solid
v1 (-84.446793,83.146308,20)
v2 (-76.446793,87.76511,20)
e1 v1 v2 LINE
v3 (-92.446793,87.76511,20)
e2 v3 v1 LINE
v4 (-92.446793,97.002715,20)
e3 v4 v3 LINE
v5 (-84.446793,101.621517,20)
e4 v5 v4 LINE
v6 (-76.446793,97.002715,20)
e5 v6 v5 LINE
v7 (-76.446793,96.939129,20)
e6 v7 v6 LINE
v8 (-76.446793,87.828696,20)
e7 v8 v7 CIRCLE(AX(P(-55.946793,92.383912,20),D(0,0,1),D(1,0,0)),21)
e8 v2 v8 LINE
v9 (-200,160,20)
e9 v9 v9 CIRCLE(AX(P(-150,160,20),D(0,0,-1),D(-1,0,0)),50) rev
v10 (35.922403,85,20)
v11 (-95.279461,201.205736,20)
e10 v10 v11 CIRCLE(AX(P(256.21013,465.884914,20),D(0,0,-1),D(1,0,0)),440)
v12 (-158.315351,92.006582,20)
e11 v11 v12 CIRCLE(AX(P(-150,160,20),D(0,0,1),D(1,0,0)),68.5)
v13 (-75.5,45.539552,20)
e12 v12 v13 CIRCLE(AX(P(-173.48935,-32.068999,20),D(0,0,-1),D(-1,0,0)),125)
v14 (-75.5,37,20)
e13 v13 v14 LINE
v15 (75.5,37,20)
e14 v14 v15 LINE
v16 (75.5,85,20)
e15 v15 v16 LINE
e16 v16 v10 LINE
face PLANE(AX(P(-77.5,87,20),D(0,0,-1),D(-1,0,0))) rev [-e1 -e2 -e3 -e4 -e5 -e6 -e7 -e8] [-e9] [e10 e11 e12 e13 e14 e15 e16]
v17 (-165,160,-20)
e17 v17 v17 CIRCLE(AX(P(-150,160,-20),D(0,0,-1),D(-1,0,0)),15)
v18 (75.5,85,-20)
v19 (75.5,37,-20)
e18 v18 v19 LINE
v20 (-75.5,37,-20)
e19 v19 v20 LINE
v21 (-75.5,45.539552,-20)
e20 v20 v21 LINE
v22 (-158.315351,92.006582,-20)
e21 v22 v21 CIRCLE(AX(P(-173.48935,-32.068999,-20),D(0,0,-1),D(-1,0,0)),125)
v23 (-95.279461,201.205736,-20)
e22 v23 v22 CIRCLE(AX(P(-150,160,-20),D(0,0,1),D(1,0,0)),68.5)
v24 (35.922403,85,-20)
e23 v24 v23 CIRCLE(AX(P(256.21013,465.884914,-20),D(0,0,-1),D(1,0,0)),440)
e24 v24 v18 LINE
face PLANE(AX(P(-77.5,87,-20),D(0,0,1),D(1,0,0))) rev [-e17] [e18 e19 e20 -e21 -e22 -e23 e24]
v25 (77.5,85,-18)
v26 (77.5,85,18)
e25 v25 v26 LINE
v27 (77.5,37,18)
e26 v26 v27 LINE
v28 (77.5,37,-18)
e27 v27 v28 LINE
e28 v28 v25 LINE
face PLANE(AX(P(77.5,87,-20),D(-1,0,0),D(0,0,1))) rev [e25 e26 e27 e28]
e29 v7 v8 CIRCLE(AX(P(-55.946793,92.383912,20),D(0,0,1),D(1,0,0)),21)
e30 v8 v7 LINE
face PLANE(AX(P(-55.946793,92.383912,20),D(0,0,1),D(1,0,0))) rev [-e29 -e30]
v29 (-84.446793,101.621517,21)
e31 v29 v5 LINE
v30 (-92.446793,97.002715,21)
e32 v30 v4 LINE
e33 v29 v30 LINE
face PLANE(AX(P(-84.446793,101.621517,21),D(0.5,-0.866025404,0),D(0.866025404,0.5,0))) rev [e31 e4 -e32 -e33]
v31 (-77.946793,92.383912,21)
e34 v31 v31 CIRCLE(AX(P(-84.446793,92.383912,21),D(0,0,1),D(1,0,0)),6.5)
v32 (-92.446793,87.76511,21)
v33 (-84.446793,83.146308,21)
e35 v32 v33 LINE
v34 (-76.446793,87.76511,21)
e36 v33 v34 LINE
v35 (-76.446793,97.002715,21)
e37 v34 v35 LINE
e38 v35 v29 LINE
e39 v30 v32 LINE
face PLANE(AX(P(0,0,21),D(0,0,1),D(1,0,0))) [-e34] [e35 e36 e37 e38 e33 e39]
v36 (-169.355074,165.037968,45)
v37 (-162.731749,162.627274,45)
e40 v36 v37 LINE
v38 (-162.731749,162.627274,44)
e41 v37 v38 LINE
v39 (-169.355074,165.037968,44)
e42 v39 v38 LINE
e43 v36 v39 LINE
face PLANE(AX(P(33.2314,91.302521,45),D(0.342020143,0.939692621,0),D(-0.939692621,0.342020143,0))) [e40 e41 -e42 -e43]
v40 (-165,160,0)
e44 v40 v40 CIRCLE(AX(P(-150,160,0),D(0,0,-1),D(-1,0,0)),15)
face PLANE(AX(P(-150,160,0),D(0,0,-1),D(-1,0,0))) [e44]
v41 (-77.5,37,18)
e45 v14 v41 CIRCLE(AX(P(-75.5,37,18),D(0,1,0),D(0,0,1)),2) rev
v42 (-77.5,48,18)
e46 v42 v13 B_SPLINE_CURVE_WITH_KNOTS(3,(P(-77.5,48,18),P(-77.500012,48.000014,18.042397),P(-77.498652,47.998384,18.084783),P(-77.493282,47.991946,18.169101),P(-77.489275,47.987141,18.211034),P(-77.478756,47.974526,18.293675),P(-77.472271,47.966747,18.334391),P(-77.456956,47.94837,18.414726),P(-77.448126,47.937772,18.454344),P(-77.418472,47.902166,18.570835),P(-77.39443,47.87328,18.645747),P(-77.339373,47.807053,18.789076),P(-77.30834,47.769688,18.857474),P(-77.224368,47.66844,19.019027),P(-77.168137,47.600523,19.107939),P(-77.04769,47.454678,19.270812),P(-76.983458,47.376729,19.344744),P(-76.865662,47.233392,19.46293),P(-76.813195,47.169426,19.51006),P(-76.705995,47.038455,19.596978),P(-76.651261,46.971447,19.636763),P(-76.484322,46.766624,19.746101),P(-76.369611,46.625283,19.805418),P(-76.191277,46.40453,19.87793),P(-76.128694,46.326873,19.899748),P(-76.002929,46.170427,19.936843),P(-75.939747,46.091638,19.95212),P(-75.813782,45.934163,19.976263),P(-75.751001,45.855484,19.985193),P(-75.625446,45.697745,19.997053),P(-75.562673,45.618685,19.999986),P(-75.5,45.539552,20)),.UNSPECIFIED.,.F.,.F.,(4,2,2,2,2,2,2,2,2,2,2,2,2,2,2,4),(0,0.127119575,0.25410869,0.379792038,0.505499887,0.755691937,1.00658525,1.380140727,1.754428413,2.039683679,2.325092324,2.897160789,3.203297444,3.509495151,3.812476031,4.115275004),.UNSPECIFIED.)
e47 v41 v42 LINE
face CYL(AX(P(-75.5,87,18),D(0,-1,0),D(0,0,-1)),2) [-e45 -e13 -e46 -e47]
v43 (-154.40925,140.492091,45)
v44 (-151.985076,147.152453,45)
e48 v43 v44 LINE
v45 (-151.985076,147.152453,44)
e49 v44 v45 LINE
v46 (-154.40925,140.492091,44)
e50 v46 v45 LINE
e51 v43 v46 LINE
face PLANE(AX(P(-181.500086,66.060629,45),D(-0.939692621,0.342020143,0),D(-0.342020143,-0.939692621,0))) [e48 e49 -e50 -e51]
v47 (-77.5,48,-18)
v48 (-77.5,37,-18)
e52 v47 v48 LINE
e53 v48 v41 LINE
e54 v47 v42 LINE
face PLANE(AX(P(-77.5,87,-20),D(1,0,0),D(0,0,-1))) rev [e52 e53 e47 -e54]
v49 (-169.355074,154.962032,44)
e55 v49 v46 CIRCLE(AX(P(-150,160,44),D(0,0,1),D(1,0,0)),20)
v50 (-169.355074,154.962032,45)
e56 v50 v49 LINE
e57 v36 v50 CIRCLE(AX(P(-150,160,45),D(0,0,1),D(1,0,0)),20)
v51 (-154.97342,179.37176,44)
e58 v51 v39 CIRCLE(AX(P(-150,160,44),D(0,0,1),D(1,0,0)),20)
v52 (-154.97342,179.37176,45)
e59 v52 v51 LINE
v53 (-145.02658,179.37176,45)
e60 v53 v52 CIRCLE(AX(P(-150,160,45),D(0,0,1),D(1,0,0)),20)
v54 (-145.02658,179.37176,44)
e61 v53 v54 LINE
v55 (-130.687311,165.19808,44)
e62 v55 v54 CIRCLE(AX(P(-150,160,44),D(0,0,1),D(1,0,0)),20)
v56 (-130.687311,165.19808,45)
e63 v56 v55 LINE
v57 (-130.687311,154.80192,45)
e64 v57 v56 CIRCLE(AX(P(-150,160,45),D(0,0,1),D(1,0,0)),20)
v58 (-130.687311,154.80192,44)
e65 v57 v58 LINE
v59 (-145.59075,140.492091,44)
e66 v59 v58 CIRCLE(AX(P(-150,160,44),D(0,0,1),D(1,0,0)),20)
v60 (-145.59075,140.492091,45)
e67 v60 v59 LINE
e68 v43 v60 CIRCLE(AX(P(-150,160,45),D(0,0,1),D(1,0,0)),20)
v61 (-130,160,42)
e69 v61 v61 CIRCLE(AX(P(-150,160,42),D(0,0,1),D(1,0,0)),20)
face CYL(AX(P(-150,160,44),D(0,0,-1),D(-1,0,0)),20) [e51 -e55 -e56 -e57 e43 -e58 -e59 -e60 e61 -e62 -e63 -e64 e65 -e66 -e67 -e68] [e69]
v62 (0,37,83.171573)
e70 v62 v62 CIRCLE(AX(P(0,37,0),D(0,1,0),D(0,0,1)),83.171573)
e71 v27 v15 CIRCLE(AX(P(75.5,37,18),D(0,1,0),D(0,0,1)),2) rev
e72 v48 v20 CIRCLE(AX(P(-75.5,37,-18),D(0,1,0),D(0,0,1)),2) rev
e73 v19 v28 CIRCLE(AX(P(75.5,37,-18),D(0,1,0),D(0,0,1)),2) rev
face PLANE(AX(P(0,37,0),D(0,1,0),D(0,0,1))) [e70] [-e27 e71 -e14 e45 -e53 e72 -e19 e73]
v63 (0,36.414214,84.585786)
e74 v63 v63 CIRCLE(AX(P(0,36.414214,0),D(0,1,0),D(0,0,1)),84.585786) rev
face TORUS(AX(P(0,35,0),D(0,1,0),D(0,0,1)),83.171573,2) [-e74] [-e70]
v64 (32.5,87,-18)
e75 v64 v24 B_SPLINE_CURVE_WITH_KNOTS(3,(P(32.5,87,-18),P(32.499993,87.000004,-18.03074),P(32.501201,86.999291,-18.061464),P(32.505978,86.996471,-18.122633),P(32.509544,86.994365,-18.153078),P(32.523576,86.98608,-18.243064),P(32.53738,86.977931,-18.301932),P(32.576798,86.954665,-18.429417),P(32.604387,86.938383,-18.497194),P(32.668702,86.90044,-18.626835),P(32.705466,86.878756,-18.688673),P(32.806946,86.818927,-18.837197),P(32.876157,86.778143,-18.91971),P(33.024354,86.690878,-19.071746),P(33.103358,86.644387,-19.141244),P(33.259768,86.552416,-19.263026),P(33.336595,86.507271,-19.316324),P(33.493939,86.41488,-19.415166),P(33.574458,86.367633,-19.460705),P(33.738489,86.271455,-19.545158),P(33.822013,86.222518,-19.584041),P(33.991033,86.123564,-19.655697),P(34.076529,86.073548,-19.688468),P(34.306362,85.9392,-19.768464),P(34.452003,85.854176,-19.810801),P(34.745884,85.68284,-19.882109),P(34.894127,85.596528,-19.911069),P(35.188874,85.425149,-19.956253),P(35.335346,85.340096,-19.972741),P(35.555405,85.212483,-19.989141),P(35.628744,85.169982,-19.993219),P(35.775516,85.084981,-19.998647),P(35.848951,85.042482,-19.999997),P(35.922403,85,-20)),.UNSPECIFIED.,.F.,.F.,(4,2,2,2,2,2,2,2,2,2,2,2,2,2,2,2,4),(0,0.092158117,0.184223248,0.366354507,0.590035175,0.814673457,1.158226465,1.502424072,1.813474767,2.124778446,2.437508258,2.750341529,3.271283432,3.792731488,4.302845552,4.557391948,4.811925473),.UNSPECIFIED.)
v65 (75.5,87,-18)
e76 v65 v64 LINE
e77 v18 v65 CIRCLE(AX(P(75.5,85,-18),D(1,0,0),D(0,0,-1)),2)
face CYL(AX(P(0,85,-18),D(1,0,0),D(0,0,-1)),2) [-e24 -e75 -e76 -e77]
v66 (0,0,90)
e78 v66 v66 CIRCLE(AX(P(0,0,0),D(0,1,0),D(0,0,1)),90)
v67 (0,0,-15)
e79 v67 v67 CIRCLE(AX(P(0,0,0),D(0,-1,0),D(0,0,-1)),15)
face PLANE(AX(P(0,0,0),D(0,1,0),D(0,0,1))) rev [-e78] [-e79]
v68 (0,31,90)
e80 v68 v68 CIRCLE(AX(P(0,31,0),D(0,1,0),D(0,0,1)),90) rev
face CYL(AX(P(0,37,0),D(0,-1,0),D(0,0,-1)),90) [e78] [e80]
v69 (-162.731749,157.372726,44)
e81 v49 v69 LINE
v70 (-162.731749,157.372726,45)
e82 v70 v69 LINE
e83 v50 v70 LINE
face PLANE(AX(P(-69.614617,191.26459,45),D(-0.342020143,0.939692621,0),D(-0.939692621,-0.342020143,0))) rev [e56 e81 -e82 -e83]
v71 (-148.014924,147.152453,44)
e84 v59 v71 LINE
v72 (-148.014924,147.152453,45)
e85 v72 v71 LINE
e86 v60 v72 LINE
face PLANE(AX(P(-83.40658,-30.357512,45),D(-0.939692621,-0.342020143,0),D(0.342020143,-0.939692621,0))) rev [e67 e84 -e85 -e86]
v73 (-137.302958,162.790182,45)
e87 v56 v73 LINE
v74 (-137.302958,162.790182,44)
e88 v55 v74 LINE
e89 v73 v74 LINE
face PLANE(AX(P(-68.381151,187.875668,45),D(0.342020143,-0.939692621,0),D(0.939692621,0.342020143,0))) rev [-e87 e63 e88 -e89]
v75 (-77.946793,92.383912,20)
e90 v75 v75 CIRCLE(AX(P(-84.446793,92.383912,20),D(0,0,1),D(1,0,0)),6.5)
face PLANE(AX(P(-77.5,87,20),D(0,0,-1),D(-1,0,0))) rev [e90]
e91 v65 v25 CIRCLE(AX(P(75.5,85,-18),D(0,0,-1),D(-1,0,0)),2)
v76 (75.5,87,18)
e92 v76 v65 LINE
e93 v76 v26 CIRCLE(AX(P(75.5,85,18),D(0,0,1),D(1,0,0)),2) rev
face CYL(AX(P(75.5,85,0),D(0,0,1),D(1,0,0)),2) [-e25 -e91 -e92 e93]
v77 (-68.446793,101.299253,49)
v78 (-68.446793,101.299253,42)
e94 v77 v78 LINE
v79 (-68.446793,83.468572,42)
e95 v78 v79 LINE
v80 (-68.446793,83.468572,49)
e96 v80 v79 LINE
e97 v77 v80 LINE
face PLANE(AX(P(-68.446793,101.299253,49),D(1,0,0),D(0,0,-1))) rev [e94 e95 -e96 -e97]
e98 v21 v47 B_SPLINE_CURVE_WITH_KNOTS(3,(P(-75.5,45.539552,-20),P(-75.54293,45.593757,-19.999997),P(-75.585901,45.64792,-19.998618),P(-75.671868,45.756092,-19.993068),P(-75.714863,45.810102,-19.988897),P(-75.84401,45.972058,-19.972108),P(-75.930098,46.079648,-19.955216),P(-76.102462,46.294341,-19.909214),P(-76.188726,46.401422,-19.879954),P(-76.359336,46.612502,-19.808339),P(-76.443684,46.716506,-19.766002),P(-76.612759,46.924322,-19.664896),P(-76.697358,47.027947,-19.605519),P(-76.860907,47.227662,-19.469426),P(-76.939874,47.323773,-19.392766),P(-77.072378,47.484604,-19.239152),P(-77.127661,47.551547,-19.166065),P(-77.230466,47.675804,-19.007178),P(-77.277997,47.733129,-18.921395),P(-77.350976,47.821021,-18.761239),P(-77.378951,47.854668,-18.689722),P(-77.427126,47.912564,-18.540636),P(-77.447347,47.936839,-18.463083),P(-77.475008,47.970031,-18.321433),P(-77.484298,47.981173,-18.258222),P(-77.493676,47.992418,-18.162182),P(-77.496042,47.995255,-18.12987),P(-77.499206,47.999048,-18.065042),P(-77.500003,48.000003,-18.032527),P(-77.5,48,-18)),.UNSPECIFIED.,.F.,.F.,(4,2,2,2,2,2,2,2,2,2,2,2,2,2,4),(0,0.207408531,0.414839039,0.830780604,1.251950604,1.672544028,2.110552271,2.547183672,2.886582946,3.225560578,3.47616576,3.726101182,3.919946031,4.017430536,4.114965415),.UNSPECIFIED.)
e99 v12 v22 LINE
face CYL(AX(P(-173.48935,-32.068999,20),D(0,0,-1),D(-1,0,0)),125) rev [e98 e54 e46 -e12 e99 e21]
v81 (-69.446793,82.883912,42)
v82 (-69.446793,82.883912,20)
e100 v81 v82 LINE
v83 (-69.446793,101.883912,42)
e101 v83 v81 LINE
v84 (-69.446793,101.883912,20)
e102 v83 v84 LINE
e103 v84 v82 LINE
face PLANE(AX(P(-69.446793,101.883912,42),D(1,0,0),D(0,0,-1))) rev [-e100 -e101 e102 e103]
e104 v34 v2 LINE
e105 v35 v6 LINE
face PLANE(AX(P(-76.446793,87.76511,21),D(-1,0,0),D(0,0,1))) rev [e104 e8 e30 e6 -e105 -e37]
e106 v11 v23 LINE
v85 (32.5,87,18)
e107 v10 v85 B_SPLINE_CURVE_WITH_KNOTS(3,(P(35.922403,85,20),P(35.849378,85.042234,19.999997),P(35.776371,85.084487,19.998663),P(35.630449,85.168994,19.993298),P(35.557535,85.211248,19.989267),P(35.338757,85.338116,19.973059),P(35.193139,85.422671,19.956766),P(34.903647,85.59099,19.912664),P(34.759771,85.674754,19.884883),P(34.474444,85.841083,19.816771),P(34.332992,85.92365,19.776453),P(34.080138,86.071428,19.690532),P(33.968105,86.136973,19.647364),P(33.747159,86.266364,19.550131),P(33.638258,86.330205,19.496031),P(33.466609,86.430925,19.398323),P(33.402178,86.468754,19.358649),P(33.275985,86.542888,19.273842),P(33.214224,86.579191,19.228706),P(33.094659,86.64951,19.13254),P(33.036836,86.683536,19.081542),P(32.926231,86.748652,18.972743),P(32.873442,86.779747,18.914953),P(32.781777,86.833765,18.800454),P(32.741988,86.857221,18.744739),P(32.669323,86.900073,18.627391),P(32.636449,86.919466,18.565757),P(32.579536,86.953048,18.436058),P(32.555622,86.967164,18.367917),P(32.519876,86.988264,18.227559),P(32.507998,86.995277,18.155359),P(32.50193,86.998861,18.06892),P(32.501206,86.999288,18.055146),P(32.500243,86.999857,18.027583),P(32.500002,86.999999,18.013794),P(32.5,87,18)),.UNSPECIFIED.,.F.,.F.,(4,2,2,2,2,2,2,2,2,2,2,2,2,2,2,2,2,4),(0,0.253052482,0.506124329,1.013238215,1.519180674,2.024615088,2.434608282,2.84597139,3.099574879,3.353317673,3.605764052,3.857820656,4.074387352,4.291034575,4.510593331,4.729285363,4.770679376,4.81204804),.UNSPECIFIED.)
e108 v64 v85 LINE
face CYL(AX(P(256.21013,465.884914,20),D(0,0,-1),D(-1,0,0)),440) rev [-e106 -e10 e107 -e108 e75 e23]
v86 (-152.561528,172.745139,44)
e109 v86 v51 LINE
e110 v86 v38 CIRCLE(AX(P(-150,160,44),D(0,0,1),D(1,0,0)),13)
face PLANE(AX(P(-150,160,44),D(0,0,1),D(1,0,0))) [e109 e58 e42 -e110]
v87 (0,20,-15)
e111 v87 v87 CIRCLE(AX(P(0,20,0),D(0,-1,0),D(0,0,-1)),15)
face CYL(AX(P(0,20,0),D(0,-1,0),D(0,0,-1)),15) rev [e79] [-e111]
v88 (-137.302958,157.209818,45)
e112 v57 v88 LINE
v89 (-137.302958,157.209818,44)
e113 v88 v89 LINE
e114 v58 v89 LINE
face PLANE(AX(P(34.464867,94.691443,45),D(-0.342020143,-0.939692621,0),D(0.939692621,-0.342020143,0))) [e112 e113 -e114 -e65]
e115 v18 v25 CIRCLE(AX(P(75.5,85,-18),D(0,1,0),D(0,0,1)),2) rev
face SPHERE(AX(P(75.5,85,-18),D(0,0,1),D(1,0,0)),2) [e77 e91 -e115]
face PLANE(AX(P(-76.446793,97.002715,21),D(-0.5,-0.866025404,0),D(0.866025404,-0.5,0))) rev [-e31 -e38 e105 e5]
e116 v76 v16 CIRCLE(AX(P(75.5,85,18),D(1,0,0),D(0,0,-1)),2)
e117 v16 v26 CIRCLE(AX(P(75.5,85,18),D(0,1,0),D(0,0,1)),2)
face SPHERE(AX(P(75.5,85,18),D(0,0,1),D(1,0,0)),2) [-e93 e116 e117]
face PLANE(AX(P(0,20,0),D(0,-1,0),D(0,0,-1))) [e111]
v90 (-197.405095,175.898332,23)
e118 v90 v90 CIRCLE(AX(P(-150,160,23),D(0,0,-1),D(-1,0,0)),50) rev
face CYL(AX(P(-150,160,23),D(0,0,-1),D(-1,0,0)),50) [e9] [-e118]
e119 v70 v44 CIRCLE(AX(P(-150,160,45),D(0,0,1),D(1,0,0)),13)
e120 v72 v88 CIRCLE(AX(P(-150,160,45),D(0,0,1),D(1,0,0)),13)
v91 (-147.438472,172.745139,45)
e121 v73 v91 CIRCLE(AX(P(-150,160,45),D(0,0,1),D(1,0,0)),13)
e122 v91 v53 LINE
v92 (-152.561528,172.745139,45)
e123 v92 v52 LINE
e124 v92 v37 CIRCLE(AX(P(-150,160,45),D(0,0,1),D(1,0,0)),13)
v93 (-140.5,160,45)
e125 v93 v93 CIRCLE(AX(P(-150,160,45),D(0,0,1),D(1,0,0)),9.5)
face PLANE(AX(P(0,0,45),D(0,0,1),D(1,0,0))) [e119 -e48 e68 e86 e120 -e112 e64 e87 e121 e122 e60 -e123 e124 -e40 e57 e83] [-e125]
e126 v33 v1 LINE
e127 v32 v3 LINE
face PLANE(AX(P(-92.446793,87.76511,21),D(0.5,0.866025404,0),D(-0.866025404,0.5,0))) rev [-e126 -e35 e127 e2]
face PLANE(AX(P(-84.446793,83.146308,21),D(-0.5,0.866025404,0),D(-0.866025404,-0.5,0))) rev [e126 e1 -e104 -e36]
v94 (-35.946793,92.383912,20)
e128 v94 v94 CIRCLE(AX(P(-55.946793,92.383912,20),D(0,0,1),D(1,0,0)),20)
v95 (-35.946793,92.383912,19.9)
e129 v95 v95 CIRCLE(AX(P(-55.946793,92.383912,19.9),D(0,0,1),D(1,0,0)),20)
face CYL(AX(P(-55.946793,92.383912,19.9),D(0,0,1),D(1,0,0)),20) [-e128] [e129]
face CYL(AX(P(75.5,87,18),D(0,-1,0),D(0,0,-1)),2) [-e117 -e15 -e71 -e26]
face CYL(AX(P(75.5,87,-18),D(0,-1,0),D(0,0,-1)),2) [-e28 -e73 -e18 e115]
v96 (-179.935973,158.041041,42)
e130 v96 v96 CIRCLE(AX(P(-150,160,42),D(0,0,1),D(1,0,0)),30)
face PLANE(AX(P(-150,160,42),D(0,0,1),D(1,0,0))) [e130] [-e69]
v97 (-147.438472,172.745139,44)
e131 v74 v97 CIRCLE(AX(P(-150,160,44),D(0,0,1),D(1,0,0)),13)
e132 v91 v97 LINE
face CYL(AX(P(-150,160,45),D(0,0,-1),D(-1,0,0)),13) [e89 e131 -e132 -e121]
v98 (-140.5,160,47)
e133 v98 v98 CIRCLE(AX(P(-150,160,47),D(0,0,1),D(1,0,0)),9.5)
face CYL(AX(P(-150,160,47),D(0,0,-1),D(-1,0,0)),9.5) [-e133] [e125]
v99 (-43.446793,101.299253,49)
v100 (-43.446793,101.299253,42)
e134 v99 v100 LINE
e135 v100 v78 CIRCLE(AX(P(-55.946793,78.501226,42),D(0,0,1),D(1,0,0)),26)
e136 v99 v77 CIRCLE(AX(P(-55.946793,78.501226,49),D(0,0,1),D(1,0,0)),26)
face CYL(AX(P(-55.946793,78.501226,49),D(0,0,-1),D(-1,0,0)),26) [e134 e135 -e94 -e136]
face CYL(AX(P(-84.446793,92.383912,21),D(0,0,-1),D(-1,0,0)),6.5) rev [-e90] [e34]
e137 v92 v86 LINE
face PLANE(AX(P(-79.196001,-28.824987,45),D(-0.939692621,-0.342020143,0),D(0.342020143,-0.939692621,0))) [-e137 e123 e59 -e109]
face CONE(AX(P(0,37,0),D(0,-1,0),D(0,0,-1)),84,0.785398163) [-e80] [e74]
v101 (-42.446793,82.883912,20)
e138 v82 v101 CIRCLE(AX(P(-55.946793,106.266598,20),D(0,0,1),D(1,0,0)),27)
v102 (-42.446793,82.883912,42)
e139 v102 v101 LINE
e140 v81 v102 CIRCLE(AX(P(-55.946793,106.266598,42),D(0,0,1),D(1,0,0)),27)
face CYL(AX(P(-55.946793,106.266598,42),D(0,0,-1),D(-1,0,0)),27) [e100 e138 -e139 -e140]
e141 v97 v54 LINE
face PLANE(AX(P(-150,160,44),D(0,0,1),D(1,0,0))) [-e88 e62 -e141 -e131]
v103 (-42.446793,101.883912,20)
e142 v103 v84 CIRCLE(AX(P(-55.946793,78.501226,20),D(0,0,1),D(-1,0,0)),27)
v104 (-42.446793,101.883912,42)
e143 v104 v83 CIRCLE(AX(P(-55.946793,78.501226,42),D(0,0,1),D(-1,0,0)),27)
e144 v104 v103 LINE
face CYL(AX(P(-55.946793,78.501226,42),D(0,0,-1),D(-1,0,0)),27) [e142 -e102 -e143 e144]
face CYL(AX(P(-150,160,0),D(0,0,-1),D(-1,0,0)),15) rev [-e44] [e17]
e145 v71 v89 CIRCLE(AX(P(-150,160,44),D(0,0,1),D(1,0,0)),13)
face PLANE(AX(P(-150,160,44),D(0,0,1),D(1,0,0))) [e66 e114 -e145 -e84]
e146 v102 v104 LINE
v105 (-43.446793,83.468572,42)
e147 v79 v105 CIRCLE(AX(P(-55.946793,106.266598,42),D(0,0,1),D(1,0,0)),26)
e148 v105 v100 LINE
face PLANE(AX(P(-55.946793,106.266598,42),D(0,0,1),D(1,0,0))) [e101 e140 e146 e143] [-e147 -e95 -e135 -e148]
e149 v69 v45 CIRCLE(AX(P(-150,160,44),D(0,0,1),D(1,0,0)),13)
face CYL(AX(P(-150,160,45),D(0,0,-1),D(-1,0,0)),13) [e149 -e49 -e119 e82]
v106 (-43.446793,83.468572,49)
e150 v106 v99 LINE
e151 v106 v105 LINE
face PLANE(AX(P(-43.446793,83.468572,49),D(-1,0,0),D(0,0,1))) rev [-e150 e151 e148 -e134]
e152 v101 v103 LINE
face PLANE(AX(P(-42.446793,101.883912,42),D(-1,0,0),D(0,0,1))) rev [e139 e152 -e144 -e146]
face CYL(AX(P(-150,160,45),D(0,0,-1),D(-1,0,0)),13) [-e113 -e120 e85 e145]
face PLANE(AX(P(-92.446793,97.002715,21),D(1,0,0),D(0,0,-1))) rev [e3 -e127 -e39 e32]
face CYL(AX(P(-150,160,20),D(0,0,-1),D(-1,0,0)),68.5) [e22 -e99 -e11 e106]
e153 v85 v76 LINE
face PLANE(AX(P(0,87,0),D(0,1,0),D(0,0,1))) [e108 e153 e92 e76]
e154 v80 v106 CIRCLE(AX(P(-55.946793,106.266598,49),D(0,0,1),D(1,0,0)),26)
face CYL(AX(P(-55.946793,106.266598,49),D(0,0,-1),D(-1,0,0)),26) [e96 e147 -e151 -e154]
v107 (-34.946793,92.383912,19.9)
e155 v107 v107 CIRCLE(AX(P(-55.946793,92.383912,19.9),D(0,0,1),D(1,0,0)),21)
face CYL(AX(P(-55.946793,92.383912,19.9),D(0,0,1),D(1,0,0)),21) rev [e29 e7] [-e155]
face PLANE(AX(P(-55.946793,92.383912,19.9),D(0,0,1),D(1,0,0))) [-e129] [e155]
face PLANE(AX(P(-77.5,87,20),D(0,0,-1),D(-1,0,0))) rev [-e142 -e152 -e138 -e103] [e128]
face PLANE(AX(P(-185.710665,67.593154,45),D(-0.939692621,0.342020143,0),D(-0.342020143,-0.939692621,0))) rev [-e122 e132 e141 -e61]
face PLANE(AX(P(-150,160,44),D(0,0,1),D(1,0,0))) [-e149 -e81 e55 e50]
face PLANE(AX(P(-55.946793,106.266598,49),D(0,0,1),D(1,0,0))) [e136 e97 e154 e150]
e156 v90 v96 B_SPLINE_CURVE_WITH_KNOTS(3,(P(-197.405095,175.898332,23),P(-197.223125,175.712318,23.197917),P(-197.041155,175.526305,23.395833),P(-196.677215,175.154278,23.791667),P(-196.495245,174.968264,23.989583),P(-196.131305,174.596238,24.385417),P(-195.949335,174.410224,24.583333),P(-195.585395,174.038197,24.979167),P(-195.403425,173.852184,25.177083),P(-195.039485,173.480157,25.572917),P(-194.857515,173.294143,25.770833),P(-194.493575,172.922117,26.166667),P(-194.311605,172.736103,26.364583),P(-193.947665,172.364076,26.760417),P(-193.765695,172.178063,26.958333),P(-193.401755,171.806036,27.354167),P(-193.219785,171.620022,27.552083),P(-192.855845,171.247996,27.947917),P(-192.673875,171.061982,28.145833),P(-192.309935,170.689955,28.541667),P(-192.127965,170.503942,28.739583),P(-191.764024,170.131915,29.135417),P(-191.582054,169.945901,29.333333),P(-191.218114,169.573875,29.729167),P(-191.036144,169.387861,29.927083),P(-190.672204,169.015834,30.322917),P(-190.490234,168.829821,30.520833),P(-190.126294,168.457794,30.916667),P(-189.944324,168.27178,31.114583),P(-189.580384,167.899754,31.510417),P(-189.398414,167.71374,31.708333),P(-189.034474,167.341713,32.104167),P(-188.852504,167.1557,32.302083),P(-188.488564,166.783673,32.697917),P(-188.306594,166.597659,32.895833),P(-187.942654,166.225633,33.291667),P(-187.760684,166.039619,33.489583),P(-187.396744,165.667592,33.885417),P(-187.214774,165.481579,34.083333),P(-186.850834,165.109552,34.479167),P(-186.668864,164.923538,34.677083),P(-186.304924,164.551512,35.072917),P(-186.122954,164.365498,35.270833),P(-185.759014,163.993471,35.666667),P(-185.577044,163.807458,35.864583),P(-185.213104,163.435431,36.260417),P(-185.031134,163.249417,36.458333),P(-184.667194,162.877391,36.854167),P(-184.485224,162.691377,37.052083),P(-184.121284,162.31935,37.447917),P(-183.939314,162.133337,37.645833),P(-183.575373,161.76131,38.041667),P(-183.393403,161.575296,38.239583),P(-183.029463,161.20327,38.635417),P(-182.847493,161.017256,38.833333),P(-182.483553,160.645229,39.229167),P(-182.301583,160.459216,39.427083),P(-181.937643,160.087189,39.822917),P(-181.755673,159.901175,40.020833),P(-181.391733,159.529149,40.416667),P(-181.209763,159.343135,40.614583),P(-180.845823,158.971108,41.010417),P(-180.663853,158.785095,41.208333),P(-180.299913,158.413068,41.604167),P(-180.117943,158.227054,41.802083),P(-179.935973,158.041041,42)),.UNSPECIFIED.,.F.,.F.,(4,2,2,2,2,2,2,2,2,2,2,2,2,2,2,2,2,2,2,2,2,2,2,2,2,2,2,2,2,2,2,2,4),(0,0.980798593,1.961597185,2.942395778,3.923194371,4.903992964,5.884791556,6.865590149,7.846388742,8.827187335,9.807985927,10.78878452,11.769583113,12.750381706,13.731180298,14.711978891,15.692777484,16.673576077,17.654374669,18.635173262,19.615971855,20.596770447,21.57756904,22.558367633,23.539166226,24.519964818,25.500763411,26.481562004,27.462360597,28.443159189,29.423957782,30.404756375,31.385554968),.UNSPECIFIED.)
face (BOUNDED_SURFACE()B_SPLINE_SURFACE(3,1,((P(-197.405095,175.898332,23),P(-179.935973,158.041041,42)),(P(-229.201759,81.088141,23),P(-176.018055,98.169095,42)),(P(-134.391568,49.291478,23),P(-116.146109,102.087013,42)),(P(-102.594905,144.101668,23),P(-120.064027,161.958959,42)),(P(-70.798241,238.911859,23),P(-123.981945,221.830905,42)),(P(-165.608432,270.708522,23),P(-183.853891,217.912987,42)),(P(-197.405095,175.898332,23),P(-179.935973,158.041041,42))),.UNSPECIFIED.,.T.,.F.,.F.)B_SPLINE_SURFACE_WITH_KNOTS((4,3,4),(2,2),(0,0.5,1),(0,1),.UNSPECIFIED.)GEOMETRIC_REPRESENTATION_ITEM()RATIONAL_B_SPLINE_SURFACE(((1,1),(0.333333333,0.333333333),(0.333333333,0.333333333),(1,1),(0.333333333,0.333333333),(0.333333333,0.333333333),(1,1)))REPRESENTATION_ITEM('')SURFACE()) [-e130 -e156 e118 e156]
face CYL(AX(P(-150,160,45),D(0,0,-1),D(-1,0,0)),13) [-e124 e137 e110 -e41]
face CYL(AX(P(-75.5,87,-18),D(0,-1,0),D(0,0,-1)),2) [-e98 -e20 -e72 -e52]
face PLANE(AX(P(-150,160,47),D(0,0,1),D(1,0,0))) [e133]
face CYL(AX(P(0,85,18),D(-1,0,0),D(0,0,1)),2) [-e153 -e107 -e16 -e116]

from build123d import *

# Parameters (mm, degrees)
SKETCH1_R            = 90
BOSS_EXTRUDE1_DEPTH  = 37
CHAMFER1_SIZE        = 6
SKETCH2_W            = 155
SKETCH2_H            = 40
BOSS_EXTRUDE2_DEPTH  = 50
CUT_EXTRUDE1_DEPTH   = 40
BOSS_EXTRUDE3_DEPTH  = 20
SKETCH8_R            = 50
BOSS_EXTRUDE4_DEPTH  = 3
SKETCH12_R           = 20
BOSS_EXTRUDE5_DEPTH  = 2
BOSS_EXTRUDE6_DEPTH  = 1
SKETCH14_R           = 9.5
BOSS_EXTRUDE7_DEPTH  = 2
BOSS_EXTRUDE9_DEPTH  = 22
BOSS_EXTRUDE10_DEPTH = 7
SKETCH18_R           = 6.5
BOSS_EXTRUDE11_DEPTH = 1
SKETCH19_R           = 21
SKETCH19_R_2         = 20
CUT_EXTRUDE12_DEPTH  = 0.1
FILLET1_R            = 2
SKETCH20_R           = 15
CUT_EXTRUDE13_DEPTH  = 20
SKETCH21_R           = 15
CUT_EXTRUDE14_DEPTH  = 20


with BuildPart() as part:
    # Sketch1 → Boss-Extrude1 (new body)
    with BuildSketch(Plane(origin=(0, 0, 0), x_dir=(1, 0, 0), z_dir=(0, 1, 0))):
        with Locations(Location((0, 0, 0), (0, 0, 270))):
            Circle(SKETCH1_R)
    extrude(amount=BOSS_EXTRUDE1_DEPTH)

    # Chamfer1
    chamfer1_edges = [part.edges().sort_by_distance(p)[0] for p in [
        (0, 37, -90),
    ]]
    chamfer(chamfer1_edges, length=CHAMFER1_SIZE)

    # Sketch2 → Boss-Extrude2 (add)
    with BuildSketch(Plane(origin=(0, 37, 0), x_dir=(1, 0, 0), z_dir=(0, 1, 0))):
        Rectangle(SKETCH2_W, SKETCH2_H)
    extrude(amount=BOSS_EXTRUDE2_DEPTH)

    # Sketch3 → Cut-Extrude1 (cut)
    with BuildSketch(Plane.XY.offset(20)):
        with BuildLine():
            Line((-77.5, 48), (-77.5, 87))
            Line((-77.5, 87), (32.5, 87))
            ThreePointArc((32.5, 87), (-18.551432041, 56.363013449), (-77.5, 48))
        make_face()
    extrude(amount=-CUT_EXTRUDE1_DEPTH, mode=Mode.SUBTRACT)

    # Sketch4 → Boss-Extrude3 (add, symmetric)
    with BuildSketch(Plane.XY):
        with BuildLine():
            ThreePointArc((-95.279461367, 201.205735666), (-209.325156185, 194.245814981), (-158.315351417, 92.00658171))
            ThreePointArc((-158.315351417, 92.00658171), (-113.710864551, 77.710473629), (-77.5, 48))
            ThreePointArc((-77.5, 48), (-18.551432041, 56.363013449), (32.5, 87))
            ThreePointArc((32.5, 87), (-37.003814726, 137.821531516), (-95.279461367, 201.205735666))
        make_face()
    extrude(amount=BOSS_EXTRUDE3_DEPTH, both=True)

    # Sketch8 → Boss-Extrude4 (add)
    with BuildSketch(Plane.XY.offset(20)):
        with Locations(Location((-150, 160, 0), (0, 0, 180))):
            Circle(SKETCH8_R)
    extrude(amount=BOSS_EXTRUDE4_DEPTH)

    # Loft2: read off the stored shape, not the designer's step
    # Loft2: loft between two sections, ruled curve by curve
    loft2_from = [
        Edge.make_bspline([(-197.405095184, 175.898331692, 23), (-229.201758567, 81.088141323, 23), (-134.391568199, 49.29147794, 23), (-102.594904816, 144.101668308, 23), (-70.798241433, 238.911858677, 23), (-165.608431801, 270.70852206, 23), (-197.405095184, 175.898331692, 23)], [0, 0, 0, 0, 0.5, 0.5, 0.5, 1, 1, 1, 1], 3, [1, 0.333333333, 0.333333333, 1, 0.333333333, 0.333333333, 1]),
    ]
    loft2_to = [
        Edge.make_bspline([(-179.935973003, 158.041041, 42), (-176.018055003, 98.169094994, 42), (-116.146108997, 102.087012994, 42), (-120.064026997, 161.958959, 42), (-123.981944997, 221.830905006, 42), (-183.853891003, 217.912987006, 42), (-179.935973003, 158.041041, 42)], [0, 0, 0, 0, 0.5, 0.5, 0.5, 1, 1, 1, 1], 3, [1, 0.333333333, 0.333333333, 1, 0.333333333, 0.333333333, 1]),
    ]
    loft2 = Solid(Shell([*[Face.make_surface_from_curves(loft2_from[k], loft2_to[k]) for k in range(1)], Face(Wire(loft2_from)), Face(Wire(loft2_to))]))
    add(loft2)

    # Sketch12 → Boss-Extrude5 (add)
    with BuildSketch(Plane.XY.offset(42)):
        with Locations((-150, 160)):
            Circle(SKETCH12_R)
    extrude(amount=BOSS_EXTRUDE5_DEPTH)

    # Sketch13 → Boss-Extrude6 (add)
    with BuildSketch(Plane.XY.offset(44)):
        with BuildLine():
            Line((-154.973420243, 179.371760144), (-152.561527516, 172.74513934))
            ThreePointArc((-152.561527516, 172.74513934), (-159.168635276, 169.216079816), (-162.73174885, 162.627274483))
            Line((-162.73174885, 162.627274483), (-169.355073812, 165.037967621))
            ThreePointArc((-169.355073812, 165.037967621), (-170, 160), (-169.355073812, 154.962032379))
            Line((-169.355073812, 154.962032379), (-162.73174885, 157.372725517))
            ThreePointArc((-162.73174885, 157.372725517), (-158.958779481, 150.579794577), (-151.985076295, 147.152452681))
            Line((-151.985076295, 147.152452681), (-154.409249727, 140.492090916))
            ThreePointArc((-154.409249727, 140.492090916), (-150, 140), (-145.590750273, 140.492090916))
            Line((-145.590750273, 140.492090916), (-148.014923705, 147.152452681))
            ThreePointArc((-148.014923705, 147.152452681), (-141.101752828, 150.522595436), (-137.302957602, 157.209818223))
            Line((-137.302957602, 157.209818223), (-130.687310868, 154.801919732))
            ThreePointArc((-130.687310868, 154.801919732), (-130.172572246, 157.378338566), (-130, 160))
            ThreePointArc((-130, 160), (-130.172572246, 162.621661434), (-130.687310868, 165.198080268))
            Line((-130.687310868, 165.198080268), (-137.302957602, 162.790181777))
            ThreePointArc((-137.302957602, 162.790181777), (-140.890593654, 169.274627541), (-147.438472484, 172.74513934))
            Line((-147.438472484, 172.74513934), (-145.026579757, 179.371760144))
            ThreePointArc((-145.026579757, 179.371760144), (-150, 180), (-154.973420243, 179.371760144))
        make_face()
    extrude(amount=BOSS_EXTRUDE6_DEPTH)

    # Sketch14 → Boss-Extrude7 (add)
    with BuildSketch(Plane.XY.offset(45)):
        with Locations((-150, 160)):
            Circle(SKETCH14_R)
    extrude(amount=BOSS_EXTRUDE7_DEPTH)

    # Sketch16 → Boss-Extrude9 (add)
    with BuildSketch(Plane.XY.offset(20)):
        with BuildLine():
            Line((-69.446792895, 101.883912358), (-69.446792895, 82.883912358))
            ThreePointArc((-69.446792895, 82.883912358), (-55.946792895, 79.266598261), (-42.446792895, 82.883912358))
            Line((-42.446792895, 82.883912358), (-42.446792895, 101.883912358))
            ThreePointArc((-42.446792895, 101.883912358), (-55.946792895, 105.501226456), (-69.446792895, 101.883912358))
        make_face()
    extrude(amount=BOSS_EXTRUDE9_DEPTH)

    # Sketch17 → Boss-Extrude10 (add)
    with BuildSketch(Plane.XY.offset(42)):
        with BuildLine():
            Line((-43.446792895, 83.46857203), (-43.446792895, 101.299252687))
            ThreePointArc((-43.446792895, 101.299252687), (-55.946792895, 104.501226456), (-68.446792895, 101.299252687))
            Line((-68.446792895, 101.299252687), (-68.446792895, 83.46857203))
            ThreePointArc((-68.446792895, 83.46857203), (-55.946792895, 80.266598261), (-43.446792895, 83.46857203))
        make_face()
    extrude(amount=BOSS_EXTRUDE10_DEPTH)

    # Sketch18 → Boss-Extrude11 (add)
    with BuildSketch(Plane.XY.offset(20)):
        Polygon((-84.446792895, 83.146308051), (-76.446792895, 87.765110205), (-76.446792895, 97.002714512), (-84.446792895, 101.621516665), (-92.446792895, 97.002714512), (-92.446792895, 87.765110205), align=None)
        with Locations((-84.446792895, 92.383912358)):
            Circle(SKETCH18_R, mode=Mode.SUBTRACT)
    extrude(amount=BOSS_EXTRUDE11_DEPTH)

    # Sketch19 → Cut-Extrude12 (cut)
    with BuildSketch(Plane.XY.offset(20)):
        with Locations((-55.946792895, 92.383912358)):
            Circle(SKETCH19_R)
        with Locations((-55.946792895, 92.383912358)):
            Circle(SKETCH19_R_2, mode=Mode.SUBTRACT)
    extrude(amount=-CUT_EXTRUDE12_DEPTH, mode=Mode.SUBTRACT)

    # Fillet1
    fillet1_edges = [part.edges().sort_by_distance(p)[0] for p in [
        (77.5, 62, 20),
        (77.5, 62, -20),
        (77.5, 87, 0),
        (55, 87, -20),
        (55, 87, 20),
        (-77.5, 42.5, 20),
        (-77.5, 42.5, -20),
        (0, 37, -84),
    ]]
    fillet(fillet1_edges, radius=FILLET1_R)

    # Sketch20 → Cut-Extrude13 (cut)
    with BuildSketch(Plane.XZ):
        with Locations(Location((0, 0, 0), (0, 0, 270))):
            Circle(SKETCH20_R)
    extrude(amount=-CUT_EXTRUDE13_DEPTH, mode=Mode.SUBTRACT)

    # Sketch21 → Cut-Extrude14 (cut)
    with BuildSketch(Plane(origin=(0, 0, -20), x_dir=(-1, 0, 0), z_dir=(0, 0, -1))):
        with Locations((150, 160)):
            Circle(SKETCH21_R)
    extrude(amount=-CUT_EXTRUDE14_DEPTH, mode=Mode.SUBTRACT)


solid = part.part
